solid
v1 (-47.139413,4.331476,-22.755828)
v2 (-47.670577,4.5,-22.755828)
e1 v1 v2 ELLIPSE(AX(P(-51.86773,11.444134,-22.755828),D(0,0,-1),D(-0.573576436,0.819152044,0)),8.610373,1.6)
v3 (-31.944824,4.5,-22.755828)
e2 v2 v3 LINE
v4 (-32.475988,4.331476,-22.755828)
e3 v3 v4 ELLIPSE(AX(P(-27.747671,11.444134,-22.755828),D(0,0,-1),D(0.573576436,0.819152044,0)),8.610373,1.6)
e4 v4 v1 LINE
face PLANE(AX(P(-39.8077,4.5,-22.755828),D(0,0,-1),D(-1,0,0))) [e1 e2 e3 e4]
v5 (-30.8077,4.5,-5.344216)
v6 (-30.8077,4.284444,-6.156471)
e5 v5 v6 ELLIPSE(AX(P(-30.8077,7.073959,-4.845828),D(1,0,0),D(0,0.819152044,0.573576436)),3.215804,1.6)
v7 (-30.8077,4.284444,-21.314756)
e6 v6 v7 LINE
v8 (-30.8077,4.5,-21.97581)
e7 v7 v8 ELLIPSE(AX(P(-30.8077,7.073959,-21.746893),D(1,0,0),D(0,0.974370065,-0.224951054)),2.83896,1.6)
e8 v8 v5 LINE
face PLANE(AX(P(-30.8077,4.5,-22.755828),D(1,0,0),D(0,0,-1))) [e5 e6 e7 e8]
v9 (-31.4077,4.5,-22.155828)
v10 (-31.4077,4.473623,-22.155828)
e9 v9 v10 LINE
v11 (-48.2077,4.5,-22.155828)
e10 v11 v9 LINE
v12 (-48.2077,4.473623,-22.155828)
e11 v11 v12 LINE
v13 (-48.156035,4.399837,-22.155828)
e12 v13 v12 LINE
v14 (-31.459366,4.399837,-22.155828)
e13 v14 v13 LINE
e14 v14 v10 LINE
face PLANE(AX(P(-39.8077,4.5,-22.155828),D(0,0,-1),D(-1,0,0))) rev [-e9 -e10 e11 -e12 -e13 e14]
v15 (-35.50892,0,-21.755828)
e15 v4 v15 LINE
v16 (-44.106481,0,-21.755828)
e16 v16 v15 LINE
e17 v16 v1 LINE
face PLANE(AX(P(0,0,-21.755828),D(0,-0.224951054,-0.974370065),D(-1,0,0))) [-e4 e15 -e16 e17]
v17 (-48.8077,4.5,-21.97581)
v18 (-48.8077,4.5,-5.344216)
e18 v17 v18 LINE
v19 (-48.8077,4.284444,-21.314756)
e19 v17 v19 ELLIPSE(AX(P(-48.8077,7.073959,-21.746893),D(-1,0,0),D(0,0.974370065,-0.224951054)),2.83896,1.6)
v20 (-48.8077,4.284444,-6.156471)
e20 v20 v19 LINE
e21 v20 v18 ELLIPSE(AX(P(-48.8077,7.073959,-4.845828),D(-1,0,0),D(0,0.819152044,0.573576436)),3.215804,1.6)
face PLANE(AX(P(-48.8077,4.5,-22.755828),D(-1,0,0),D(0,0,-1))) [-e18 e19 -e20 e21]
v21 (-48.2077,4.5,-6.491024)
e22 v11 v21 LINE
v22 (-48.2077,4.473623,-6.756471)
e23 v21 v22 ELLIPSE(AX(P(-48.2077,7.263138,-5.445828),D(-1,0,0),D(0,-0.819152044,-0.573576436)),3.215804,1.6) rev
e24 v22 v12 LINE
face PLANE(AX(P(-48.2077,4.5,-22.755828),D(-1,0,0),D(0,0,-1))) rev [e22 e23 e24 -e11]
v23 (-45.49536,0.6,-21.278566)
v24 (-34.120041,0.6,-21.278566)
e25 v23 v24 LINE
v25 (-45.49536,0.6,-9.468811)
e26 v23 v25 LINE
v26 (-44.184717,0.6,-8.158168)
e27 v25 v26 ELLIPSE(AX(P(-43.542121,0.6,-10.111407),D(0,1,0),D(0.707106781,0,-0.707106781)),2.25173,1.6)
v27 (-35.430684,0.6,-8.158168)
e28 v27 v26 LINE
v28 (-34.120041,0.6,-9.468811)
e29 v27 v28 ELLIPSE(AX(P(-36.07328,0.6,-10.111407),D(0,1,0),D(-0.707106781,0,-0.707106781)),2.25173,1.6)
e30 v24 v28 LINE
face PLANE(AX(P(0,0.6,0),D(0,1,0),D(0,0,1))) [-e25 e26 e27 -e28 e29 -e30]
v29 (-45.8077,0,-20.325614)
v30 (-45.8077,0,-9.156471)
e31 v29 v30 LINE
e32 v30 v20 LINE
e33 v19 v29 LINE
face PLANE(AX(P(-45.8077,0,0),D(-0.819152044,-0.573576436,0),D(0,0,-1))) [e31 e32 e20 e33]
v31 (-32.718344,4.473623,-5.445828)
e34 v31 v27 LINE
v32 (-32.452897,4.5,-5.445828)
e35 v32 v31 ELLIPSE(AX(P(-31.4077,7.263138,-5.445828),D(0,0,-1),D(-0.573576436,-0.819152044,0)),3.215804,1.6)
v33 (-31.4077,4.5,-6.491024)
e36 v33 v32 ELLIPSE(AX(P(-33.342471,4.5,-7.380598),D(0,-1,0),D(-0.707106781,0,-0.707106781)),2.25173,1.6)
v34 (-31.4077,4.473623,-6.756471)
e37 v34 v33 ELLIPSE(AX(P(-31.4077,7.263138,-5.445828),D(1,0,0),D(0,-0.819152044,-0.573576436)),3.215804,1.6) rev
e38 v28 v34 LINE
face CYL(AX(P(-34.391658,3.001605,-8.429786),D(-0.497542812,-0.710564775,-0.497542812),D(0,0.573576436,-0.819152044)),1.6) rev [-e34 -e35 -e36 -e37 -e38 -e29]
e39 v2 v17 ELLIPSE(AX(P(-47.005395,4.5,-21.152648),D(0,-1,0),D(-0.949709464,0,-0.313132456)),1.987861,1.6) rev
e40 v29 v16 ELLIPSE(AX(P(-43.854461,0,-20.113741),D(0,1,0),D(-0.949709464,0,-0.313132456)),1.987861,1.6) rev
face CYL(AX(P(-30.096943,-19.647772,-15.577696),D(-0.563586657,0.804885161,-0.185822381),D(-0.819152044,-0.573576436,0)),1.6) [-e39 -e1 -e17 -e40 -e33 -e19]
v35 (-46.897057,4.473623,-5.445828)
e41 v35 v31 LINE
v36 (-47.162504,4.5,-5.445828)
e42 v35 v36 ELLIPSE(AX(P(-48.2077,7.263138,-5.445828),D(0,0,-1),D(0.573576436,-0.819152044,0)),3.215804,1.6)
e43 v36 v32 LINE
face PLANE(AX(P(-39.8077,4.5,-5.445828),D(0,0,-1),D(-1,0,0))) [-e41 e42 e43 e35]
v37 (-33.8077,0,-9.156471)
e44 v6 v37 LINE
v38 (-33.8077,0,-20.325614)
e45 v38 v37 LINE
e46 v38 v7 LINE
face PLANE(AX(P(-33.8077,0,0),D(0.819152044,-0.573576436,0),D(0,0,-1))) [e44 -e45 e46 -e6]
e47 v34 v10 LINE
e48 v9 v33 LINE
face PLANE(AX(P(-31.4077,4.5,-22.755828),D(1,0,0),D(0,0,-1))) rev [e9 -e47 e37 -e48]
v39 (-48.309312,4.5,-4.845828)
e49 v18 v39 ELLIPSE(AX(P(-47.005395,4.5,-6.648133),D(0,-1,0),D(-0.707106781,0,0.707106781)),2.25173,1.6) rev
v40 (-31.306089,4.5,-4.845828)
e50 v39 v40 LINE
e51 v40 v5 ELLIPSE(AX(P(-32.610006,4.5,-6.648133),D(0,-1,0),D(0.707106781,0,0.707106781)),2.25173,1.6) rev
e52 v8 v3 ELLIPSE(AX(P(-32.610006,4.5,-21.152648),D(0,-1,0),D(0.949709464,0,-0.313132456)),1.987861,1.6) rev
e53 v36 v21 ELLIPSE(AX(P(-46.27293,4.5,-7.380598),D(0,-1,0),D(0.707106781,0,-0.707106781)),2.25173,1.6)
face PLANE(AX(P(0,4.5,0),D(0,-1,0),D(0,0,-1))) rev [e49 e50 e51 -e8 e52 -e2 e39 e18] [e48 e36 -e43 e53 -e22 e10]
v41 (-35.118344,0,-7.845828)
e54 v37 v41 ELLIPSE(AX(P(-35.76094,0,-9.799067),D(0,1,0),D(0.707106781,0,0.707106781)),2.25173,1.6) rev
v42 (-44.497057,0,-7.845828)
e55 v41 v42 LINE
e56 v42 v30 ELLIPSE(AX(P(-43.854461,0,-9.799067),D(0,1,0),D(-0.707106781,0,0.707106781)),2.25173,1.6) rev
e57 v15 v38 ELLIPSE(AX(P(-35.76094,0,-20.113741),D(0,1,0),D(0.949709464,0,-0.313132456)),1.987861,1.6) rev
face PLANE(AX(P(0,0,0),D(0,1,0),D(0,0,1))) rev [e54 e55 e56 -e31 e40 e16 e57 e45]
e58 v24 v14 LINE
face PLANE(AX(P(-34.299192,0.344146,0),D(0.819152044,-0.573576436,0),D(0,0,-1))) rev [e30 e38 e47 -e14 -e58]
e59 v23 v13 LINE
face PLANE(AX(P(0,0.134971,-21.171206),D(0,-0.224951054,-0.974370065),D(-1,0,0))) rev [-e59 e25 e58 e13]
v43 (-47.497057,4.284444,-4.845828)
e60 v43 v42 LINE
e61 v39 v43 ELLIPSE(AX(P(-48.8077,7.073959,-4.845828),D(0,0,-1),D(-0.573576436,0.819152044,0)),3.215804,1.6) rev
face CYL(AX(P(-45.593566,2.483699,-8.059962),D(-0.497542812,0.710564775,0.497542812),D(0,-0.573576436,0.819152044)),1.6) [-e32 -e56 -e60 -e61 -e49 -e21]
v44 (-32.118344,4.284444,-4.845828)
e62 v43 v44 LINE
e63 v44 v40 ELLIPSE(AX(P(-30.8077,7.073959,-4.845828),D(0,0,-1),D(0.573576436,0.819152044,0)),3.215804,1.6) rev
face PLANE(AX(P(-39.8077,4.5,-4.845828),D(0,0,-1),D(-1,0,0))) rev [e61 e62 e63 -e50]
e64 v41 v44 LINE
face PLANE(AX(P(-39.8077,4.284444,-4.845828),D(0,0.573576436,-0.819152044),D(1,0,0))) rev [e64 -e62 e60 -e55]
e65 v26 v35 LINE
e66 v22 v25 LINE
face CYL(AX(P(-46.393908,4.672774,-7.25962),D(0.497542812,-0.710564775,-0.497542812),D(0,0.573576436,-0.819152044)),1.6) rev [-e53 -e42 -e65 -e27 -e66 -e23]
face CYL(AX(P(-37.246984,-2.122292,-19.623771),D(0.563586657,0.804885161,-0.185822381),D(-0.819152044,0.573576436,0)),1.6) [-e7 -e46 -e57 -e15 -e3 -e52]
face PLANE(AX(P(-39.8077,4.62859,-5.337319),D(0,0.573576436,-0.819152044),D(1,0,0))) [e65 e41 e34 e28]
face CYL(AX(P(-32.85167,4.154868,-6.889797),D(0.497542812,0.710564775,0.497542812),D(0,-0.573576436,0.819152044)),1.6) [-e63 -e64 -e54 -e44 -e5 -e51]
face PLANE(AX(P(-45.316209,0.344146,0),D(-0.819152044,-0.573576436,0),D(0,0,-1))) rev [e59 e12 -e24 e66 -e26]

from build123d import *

# Parameters (mm, degrees)
SKETCH1_W            = 5.409999999999997
SKETCH1_H            = 5.409999999999997
SKETCH1_W_2          = 4.549942703341507
SKETCH1_H_2          = 4.549942703341509
SKETCH1_W_3          = 0.4399999999999977
BOSS_EXTRUDE8_DEPTH  = 8.9
SKETCH2_W            = 0.24999999999999645
SKETCH2_H            = 1.5849393526398075
SKETCH2_W_2          = 0.25
CUT_EXTRUDE1_DEPTH   = 1
SKETCH3_W            = 2.0000000000000036
SKETCH3_H            = 0.1681942632906388
BOSS_EXTRUDE9_DEPTH  = 0.44
BOSS_EXTRUDE10_DEPTH = 2
SKETCH6_W            = 3.0119840570828487
SKETCH6_H            = 5.999459520470431
CUT_EXTRUDE2_DEPTH   = 10
SKETCH8_W            = 9
SKETCH8_H            = 17.909999999999997
BOSS_EXTRUDE11_DEPTH = 4.5
CHAMFER3_SIZE        = 3
CHAMFER3_SIZE2       = 4.2844440202263625
CHAMFER4_SIZE        = 1
CHAMFER4_SIZE2       = 4.331475874284207
SKETCH12_W           = 8.408099926910044
SKETCH12_H           = 4.631365679829861
CUT_EXTRUDE3_DEPTH   = 30
SHELL6_T             = -0.6
FILLET1_R            = 1.6
FILLET4_R            = 1.6


# Read off the part's stored shape, not the designer's step: Mirror5
with BuildPart() as part:
    # Sketch1 → Boss-Extrude8 (new body)
    # profile 1 of 10: a face of its own
    with BuildSketch(Plane(origin=(0, 0, 0), x_dir=(1, 0, 0), z_dir=(0, 1, 0))):
        with Locations((-39.80770033929644, 14.55082776302726)):
            Rectangle(SKETCH1_W, SKETCH1_H)
        with Locations((-39.79772898762569, 14.560799114698018)):
            Rectangle(SKETCH1_W_2, SKETCH1_H_2, mode=Mode.SUBTRACT)
    # profile 2 of 10: a face of its own
    with BuildSketch(Plane(origin=(0, 0, 0), x_dir=(1, 0, 0), z_dir=(0, 1, 0))):
        with Locations((-39.80770033929644, 14.560799114698018)):
            Rectangle(SKETCH1_W_3, SKETCH1_H_2)
    # profile 3 of 10: a face of its own
    with BuildSketch(Plane(origin=(0, 0, 0), x_dir=(1, 0, 0), z_dir=(0, 1, 0))):
        with BuildLine():
            ThreePointArc((-42.09264304263795, 17.25582776302726), (-42.302671690967195, 17.47082776302726), (-42.51270033929644, 17.25582776302726))
            Line((-42.51270033929644, 17.25582776302726), (-42.09264304263795, 17.25582776302726))
        make_face()
    # profile 4 of 10: a face of its own
    with BuildSketch(Plane(origin=(0, 0, 0), x_dir=(1, 0, 0), z_dir=(0, 1, 0))):
        with BuildLine():
            ThreePointArc((-42.51270033929644, 17.255827763027263), (-42.72270033929644, 17.035827763027264), (-42.51270033929644, 16.815827763027265))
            Line((-42.51270033929644, 16.815827763027265), (-42.51270033929644, 17.25582776302726))
        make_face()
    # profile 5 of 10: a face of its own
    with BuildSketch(Plane(origin=(0, 0, 0), x_dir=(1, 0, 0), z_dir=(0, 1, 0))):
        with BuildLine():
            ThreePointArc((-42.51270033929644, 12.285827763027262), (-42.722700339296445, 12.065827763027261), (-42.51270033929644, 11.84582776302726))
            Line((-42.51270033929644, 11.845827763027263), (-42.51270033929644, 12.285827763027262))
        make_face()
    # profile 6 of 10: a face of its own
    with BuildSketch(Plane(origin=(0, 0, 0), x_dir=(1, 0, 0), z_dir=(0, 1, 0))):
        with BuildLine():
            Line((-42.09264304263795, 11.845827763027263), (-42.51270033929644, 11.845827763027263))
            ThreePointArc((-42.51270033929644, 11.845827763027263), (-42.302671690967195, 11.630827763027263), (-42.09264304263795, 11.845827763027263))
        make_face()
    # profile 7 of 10: a face of its own
    with BuildSketch(Plane(origin=(0, 0, 0), x_dir=(1, 0, 0), z_dir=(0, 1, 0))):
        with BuildLine():
            Line((-37.10270033929644, 11.845827763027263), (-37.522757635954925, 11.845827763027263))
            ThreePointArc((-37.522757635954925, 11.845827763027263), (-37.31272898762568, 11.630827763027263), (-37.10270033929644, 11.845827763027263))
        make_face()
    # profile 8 of 10: a face of its own
    with BuildSketch(Plane(origin=(0, 0, 0), x_dir=(1, 0, 0), z_dir=(0, 1, 0))):
        with BuildLine():
            Line((-37.10270033929644, 12.285827763027264), (-37.10270033929644, 11.845827763027263))
            ThreePointArc((-37.10270033929644, 11.845827763027259), (-36.89270033929645, 12.065827763027261), (-37.10270033929644, 12.285827763027264))
        make_face()
    # profile 9 of 10: a face of its own
    with BuildSketch(Plane(origin=(0, 0, 0), x_dir=(1, 0, 0), z_dir=(0, 1, 0))):
        with BuildLine():
            ThreePointArc((-37.10270033929644, 17.25582776302726), (-37.31272898762568, 17.47082776302726), (-37.522757635954925, 17.25582776302726))
            Line((-37.522757635954925, 17.25582776302726), (-37.10270033929644, 17.25582776302726))
        make_face()
    # profile 10 of 10: a face of its own
    with BuildSketch(Plane(origin=(0, 0, 0), x_dir=(1, 0, 0), z_dir=(0, 1, 0))):
        with BuildLine():
            Line((-37.10270033929644, 17.25582776302726), (-37.10270033929644, 16.815827763027265))
            ThreePointArc((-37.10270033929644, 16.815827763027265), (-36.89270033929645, 17.035827763027264), (-37.10270033929644, 17.255827763027263))
        make_face()
    extrude(amount=BOSS_EXTRUDE8_DEPTH)

    # Sketch2 → Cut-Extrude1 (cut)
    with BuildSketch(Plane(origin=(-37.10270033929644, 0, 0), x_dir=(0, 0, -1), z_dir=(1, 0, 0))):
        Polygon((13.55082776302726, 7.315060647360192), (13.300827763027263, 7.315060647360192), (13.300827763027263, 3.9000000000000004), (13.550827763027263, 3.9), align=None)
        with Locations((13.42582776302726, 8.107530323680097)):
            Rectangle(SKETCH2_W, SKETCH2_H)
        with Locations((15.675827763027263, 8.107530323680097)):
            Rectangle(SKETCH2_W_2, SKETCH2_H)
        Polygon((15.800827763027263, 7.315060647360192), (15.550827763027263, 7.315060647360192), (15.550827763027264, 3.9000000000000004), (15.800827763027263, 3.9), align=None)
    extrude(amount=-CUT_EXTRUDE1_DEPTH, mode=Mode.SUBTRACT)

    # Sketch3 → Boss-Extrude9 (add)
    with BuildSketch(Plane(origin=(-37.10270033929644, 0, 0), x_dir=(0, 0, -1), z_dir=(1, 0, 0))):
        with Locations((14.55082776302726, 6.984097131645319)):
            Rectangle(SKETCH3_W, SKETCH3_H)
    extrude(amount=BOSS_EXTRUDE9_DEPTH)

    # Sketch5 → Boss-Extrude10 (add)
    with BuildSketch(Plane.XY.offset(-13.55082776302726)):
        Polygon((-36.662700339296435, 7.068194263290638), (-37.10270033929644, 8.9), (-37.10270033929644, 7.068194263290638), align=None)
    extrude(amount=-BOSS_EXTRUDE10_DEPTH)

    # Sketch6 → Cut-Extrude2 (cut)
    with BuildSketch(Plane(origin=(0, 8.9, 0), x_dir=(1, 0, 0), z_dir=(0, 1, 0))):
        with Locations((-41.31369236783786, 14.541370123902443)):
            Rectangle(SKETCH6_W, SKETCH6_H)
    extrude(amount=-CUT_EXTRUDE2_DEPTH, mode=Mode.SUBTRACT)

    # Sketch8 → Boss-Extrude11 (add)
    with BuildSketch(Plane.XZ):
        with Locations((-35.30770033929644, -13.80082776302726)):
            Rectangle(SKETCH8_W, SKETCH8_H)
    extrude(amount=-BOSS_EXTRUDE11_DEPTH)

    # Chamfer3
    chamfer3_edges = [part.edges().sort_by_distance(p)[0] for p in [
        (-30.80770033929644, 0, -13.80082776302726),
        (-35.30770033929644, 0, -4.845827763027263),
    ]]
    chamfer3_side = [part.faces().sort_by_distance(p)[0] for p in [
        (-35.30770033929644, 0, -13.80082776302726),
    ]]
    chamfer(chamfer3_edges, length=CHAMFER3_SIZE, length2=CHAMFER3_SIZE2, reference=chamfer3_side[0])

    # Chamfer4
    chamfer4_edges = [part.edges().sort_by_distance(p)[0] for p in [
        (-36.80770033929644, 0, -22.75582776302726),
    ]]
    chamfer4_side = [part.faces().sort_by_distance(p)[0] for p in [
        (-36.80770033929644, 0, -15.300827763027259),
    ]]
    chamfer(chamfer4_edges, length=CHAMFER4_SIZE, length2=CHAMFER4_SIZE2, reference=chamfer4_side[0])

    # Sketch12 → Cut-Extrude3 (cut)
    with BuildSketch(Plane.ZY.offset(39.80770033929644)):
        with Locations((-13.543811608056215, 6.81568283991493)):
            Rectangle(SKETCH12_W, SKETCH12_H)
    extrude(amount=-CUT_EXTRUDE3_DEPTH, mode=Mode.SUBTRACT)

    # Shell6
    shell6_openings = [part.faces().sort_by_distance(p)[0] for p in [
        (-39.807700339, 2.347603862, -14.251531758),
        (-35.307700339, 4.5, -13.800827763),
    ]]
    offset(amount=SHELL6_T, openings=shell6_openings, kind=Kind.INTERSECTION)

    # Mirror5: part across plane


with BuildPart() as part_1:
    add(part.part)
    add(part.part.mirror(Plane(origin=(-39.80770033929644, -1.1000000000000003, -17.541099884137658), x_dir=(0, 0, 1), z_dir=(1, 0, 0))))

    # Fillet1
    # the kernel refuses this fillet: 1.6 mm, written as the material it takes off along each edge
    with BuildSketch(Plane(origin=(-35.22184592572937, -2.0196092005073596, -9.259973349460195), x_dir=(0.2853788331334057, 0.40756321170586113, -0.867439421552548), z_dir=(0.4975428121645219, 0.7105647754616313, 0.4975428121645219))) as fillet1_piece_1:
        with BuildLine():
            CenterArc((FILLET1_R * 0.710564775462, FILLET1_R), FILLET1_R, 199.20747972534394, 70.79252027465611)
            Line((-FILLET1_R * 0.233768654558, FILLET1_R * 0.671010071663), (0, 0))
            Line((0, 0), (FILLET1_R * 0.710564775462, -5e-17))
        make_face()
    extrude(amount=11.714150079890267, mode=Mode.SUBTRACT)
    with BuildSketch(Plane(origin=(-44.39355475286351, -2.0196092005073587, -9.259973349460195), x_dir=(0.8674394215525482, 0.40756321170586235, 0.2853788331334039), z_dir=(-0.4975428121645219, 0.7105647754616313, 0.4975428121645219))) as fillet1_piece_2:
        with BuildLine():
            CenterArc((FILLET1_R * 0.710564775462, FILLET1_R), FILLET1_R, 199.20747972534403, 70.792520274656)
            Line((-FILLET1_R * 0.233768654558, FILLET1_R * 0.671010071663), (0, 0))
            Line((0, 0), (FILLET1_R * 0.710564775462, 1e-17))
        make_face()
    extrude(amount=11.714150079890267, mode=Mode.SUBTRACT)
    with BuildSketch(Plane(origin=(-43.82767365962377, -2.8277711558707384, -21.102985351354345), x_dir=(-0.10658333920242485, 0.1522167834338588, 0.9825833515002738), z_dir=(-0.5635866571713927, 0.8048851610657796, -0.1858223811990618))) as fillet1_piece_3:
        with BuildLine():
            CenterArc((FILLET1_R * 0.87831509781, FILLET1_R), FILLET1_R, 187.41334827823792, 82.58665172176217)
            Line((-FILLET1_R * 0.11332603197, FILLET1_R * 0.870973375896), (0, 0))
            Line((0, 0), (FILLET1_R * 0.87831509781, -2e-17))
        make_face()
    extrude(amount=12.349570861520077, mode=Mode.SUBTRACT)
    with BuildSketch(Plane(origin=(-35.78772701896911, -2.8277711558707392, -21.102985351354345), x_dir=(0.10658333920242458, 0.15221678343385903, 0.9825833515002738), z_dir=(0.5635866571713927, 0.8048851610657796, -0.1858223811990618))) as fillet1_piece_4:
        with BuildLine():
            CenterArc((FILLET1_R * 0.87831509781, -FILLET1_R), FILLET1_R, 89.99999999999993, 82.58665172176215)
            Line((-FILLET1_R * 0.11332603197, -FILLET1_R * 0.870973375896), (0, 0))
            Line((0, 0), (FILLET1_R * 0.87831509781, -1e-17))
        make_face()
    extrude(amount=12.349570861520073, mode=Mode.SUBTRACT)

    # Fillet4
    # the kernel refuses this fillet: 1.6 mm, written as the material it adds along each edge
    with BuildSketch(Plane(origin=(-49.62184592572936, 6.4932324940611, -4.031682176594339), x_dir=(0.867439421552548, 0.40756321170586235, 0.28537883313340373), z_dir=(0.4975428121645219, -0.7105647754616313, -0.4975428121645219))) as fillet4_piece_1_section:
        with BuildLine():
            CenterArc((FILLET4_R * 0.710564775462, -FILLET4_R), FILLET4_R, 89.99999999999997, 70.79252027465614)
            Line((-FILLET4_R * 0.233768654558, -FILLET4_R * 0.671010071663), (0, 0))
            Line((0, 0), (FILLET4_R * 0.710564775462, -1e-17))
        make_face()
    fillet4_piece_1 = extrude(amount=11.13598924099177, mode=Mode.PRIVATE)
    fillet4_piece_1 = split(fillet4_piece_1, bisect_by=Plane(origin=(-46.579824148031086, 4.5, -7.073703954292618), z_dir=(0, -1, 0)), keep=Keep.TOP, mode=Mode.PRIVATE)
    fillet4_piece_1 = split(fillet4_piece_1, bisect_by=Plane(origin=(-46.579824148031086, 0.6, -7.073703954292618), z_dir=(0, 1, 0)), keep=Keep.TOP, mode=Mode.PRIVATE)
    add(fillet4_piece_1)
    with BuildSketch(Plane(origin=(-29.993554752863513, 6.4932324940611, -4.031682176594337), x_dir=(-0.867439421552548, 0.40756321170586274, 0.28537883313340323), z_dir=(-0.4975428121645219, -0.7105647754616313, -0.4975428121645219))) as fillet4_piece_2_section:
        with BuildLine():
            CenterArc((FILLET4_R * 0.710564775462, FILLET4_R), FILLET4_R, 199.20747972534394, 70.79252027465606)
            Line((-FILLET4_R * 0.233768654558, FILLET4_R * 0.671010071663), (0, 0))
            Line((0, 0), (FILLET4_R * 0.710564775462, -6e-17))
        make_face()
    fillet4_piece_2 = extrude(amount=11.13598924099177, mode=Mode.PRIVATE)
    fillet4_piece_2 = split(fillet4_piece_2, bisect_by=Plane(origin=(-33.035576530561805, 4.5, -7.07370395429263), z_dir=(0, -1, 0)), keep=Keep.TOP, mode=Mode.PRIVATE)
    fillet4_piece_2 = split(fillet4_piece_2, bisect_by=Plane(origin=(-33.035576530561805, 0.6, -7.07370395429263), z_dir=(0, 1, 0)), keep=Keep.TOP, mode=Mode.PRIVATE)
    add(fillet4_piece_2)


solid = part_1.part
